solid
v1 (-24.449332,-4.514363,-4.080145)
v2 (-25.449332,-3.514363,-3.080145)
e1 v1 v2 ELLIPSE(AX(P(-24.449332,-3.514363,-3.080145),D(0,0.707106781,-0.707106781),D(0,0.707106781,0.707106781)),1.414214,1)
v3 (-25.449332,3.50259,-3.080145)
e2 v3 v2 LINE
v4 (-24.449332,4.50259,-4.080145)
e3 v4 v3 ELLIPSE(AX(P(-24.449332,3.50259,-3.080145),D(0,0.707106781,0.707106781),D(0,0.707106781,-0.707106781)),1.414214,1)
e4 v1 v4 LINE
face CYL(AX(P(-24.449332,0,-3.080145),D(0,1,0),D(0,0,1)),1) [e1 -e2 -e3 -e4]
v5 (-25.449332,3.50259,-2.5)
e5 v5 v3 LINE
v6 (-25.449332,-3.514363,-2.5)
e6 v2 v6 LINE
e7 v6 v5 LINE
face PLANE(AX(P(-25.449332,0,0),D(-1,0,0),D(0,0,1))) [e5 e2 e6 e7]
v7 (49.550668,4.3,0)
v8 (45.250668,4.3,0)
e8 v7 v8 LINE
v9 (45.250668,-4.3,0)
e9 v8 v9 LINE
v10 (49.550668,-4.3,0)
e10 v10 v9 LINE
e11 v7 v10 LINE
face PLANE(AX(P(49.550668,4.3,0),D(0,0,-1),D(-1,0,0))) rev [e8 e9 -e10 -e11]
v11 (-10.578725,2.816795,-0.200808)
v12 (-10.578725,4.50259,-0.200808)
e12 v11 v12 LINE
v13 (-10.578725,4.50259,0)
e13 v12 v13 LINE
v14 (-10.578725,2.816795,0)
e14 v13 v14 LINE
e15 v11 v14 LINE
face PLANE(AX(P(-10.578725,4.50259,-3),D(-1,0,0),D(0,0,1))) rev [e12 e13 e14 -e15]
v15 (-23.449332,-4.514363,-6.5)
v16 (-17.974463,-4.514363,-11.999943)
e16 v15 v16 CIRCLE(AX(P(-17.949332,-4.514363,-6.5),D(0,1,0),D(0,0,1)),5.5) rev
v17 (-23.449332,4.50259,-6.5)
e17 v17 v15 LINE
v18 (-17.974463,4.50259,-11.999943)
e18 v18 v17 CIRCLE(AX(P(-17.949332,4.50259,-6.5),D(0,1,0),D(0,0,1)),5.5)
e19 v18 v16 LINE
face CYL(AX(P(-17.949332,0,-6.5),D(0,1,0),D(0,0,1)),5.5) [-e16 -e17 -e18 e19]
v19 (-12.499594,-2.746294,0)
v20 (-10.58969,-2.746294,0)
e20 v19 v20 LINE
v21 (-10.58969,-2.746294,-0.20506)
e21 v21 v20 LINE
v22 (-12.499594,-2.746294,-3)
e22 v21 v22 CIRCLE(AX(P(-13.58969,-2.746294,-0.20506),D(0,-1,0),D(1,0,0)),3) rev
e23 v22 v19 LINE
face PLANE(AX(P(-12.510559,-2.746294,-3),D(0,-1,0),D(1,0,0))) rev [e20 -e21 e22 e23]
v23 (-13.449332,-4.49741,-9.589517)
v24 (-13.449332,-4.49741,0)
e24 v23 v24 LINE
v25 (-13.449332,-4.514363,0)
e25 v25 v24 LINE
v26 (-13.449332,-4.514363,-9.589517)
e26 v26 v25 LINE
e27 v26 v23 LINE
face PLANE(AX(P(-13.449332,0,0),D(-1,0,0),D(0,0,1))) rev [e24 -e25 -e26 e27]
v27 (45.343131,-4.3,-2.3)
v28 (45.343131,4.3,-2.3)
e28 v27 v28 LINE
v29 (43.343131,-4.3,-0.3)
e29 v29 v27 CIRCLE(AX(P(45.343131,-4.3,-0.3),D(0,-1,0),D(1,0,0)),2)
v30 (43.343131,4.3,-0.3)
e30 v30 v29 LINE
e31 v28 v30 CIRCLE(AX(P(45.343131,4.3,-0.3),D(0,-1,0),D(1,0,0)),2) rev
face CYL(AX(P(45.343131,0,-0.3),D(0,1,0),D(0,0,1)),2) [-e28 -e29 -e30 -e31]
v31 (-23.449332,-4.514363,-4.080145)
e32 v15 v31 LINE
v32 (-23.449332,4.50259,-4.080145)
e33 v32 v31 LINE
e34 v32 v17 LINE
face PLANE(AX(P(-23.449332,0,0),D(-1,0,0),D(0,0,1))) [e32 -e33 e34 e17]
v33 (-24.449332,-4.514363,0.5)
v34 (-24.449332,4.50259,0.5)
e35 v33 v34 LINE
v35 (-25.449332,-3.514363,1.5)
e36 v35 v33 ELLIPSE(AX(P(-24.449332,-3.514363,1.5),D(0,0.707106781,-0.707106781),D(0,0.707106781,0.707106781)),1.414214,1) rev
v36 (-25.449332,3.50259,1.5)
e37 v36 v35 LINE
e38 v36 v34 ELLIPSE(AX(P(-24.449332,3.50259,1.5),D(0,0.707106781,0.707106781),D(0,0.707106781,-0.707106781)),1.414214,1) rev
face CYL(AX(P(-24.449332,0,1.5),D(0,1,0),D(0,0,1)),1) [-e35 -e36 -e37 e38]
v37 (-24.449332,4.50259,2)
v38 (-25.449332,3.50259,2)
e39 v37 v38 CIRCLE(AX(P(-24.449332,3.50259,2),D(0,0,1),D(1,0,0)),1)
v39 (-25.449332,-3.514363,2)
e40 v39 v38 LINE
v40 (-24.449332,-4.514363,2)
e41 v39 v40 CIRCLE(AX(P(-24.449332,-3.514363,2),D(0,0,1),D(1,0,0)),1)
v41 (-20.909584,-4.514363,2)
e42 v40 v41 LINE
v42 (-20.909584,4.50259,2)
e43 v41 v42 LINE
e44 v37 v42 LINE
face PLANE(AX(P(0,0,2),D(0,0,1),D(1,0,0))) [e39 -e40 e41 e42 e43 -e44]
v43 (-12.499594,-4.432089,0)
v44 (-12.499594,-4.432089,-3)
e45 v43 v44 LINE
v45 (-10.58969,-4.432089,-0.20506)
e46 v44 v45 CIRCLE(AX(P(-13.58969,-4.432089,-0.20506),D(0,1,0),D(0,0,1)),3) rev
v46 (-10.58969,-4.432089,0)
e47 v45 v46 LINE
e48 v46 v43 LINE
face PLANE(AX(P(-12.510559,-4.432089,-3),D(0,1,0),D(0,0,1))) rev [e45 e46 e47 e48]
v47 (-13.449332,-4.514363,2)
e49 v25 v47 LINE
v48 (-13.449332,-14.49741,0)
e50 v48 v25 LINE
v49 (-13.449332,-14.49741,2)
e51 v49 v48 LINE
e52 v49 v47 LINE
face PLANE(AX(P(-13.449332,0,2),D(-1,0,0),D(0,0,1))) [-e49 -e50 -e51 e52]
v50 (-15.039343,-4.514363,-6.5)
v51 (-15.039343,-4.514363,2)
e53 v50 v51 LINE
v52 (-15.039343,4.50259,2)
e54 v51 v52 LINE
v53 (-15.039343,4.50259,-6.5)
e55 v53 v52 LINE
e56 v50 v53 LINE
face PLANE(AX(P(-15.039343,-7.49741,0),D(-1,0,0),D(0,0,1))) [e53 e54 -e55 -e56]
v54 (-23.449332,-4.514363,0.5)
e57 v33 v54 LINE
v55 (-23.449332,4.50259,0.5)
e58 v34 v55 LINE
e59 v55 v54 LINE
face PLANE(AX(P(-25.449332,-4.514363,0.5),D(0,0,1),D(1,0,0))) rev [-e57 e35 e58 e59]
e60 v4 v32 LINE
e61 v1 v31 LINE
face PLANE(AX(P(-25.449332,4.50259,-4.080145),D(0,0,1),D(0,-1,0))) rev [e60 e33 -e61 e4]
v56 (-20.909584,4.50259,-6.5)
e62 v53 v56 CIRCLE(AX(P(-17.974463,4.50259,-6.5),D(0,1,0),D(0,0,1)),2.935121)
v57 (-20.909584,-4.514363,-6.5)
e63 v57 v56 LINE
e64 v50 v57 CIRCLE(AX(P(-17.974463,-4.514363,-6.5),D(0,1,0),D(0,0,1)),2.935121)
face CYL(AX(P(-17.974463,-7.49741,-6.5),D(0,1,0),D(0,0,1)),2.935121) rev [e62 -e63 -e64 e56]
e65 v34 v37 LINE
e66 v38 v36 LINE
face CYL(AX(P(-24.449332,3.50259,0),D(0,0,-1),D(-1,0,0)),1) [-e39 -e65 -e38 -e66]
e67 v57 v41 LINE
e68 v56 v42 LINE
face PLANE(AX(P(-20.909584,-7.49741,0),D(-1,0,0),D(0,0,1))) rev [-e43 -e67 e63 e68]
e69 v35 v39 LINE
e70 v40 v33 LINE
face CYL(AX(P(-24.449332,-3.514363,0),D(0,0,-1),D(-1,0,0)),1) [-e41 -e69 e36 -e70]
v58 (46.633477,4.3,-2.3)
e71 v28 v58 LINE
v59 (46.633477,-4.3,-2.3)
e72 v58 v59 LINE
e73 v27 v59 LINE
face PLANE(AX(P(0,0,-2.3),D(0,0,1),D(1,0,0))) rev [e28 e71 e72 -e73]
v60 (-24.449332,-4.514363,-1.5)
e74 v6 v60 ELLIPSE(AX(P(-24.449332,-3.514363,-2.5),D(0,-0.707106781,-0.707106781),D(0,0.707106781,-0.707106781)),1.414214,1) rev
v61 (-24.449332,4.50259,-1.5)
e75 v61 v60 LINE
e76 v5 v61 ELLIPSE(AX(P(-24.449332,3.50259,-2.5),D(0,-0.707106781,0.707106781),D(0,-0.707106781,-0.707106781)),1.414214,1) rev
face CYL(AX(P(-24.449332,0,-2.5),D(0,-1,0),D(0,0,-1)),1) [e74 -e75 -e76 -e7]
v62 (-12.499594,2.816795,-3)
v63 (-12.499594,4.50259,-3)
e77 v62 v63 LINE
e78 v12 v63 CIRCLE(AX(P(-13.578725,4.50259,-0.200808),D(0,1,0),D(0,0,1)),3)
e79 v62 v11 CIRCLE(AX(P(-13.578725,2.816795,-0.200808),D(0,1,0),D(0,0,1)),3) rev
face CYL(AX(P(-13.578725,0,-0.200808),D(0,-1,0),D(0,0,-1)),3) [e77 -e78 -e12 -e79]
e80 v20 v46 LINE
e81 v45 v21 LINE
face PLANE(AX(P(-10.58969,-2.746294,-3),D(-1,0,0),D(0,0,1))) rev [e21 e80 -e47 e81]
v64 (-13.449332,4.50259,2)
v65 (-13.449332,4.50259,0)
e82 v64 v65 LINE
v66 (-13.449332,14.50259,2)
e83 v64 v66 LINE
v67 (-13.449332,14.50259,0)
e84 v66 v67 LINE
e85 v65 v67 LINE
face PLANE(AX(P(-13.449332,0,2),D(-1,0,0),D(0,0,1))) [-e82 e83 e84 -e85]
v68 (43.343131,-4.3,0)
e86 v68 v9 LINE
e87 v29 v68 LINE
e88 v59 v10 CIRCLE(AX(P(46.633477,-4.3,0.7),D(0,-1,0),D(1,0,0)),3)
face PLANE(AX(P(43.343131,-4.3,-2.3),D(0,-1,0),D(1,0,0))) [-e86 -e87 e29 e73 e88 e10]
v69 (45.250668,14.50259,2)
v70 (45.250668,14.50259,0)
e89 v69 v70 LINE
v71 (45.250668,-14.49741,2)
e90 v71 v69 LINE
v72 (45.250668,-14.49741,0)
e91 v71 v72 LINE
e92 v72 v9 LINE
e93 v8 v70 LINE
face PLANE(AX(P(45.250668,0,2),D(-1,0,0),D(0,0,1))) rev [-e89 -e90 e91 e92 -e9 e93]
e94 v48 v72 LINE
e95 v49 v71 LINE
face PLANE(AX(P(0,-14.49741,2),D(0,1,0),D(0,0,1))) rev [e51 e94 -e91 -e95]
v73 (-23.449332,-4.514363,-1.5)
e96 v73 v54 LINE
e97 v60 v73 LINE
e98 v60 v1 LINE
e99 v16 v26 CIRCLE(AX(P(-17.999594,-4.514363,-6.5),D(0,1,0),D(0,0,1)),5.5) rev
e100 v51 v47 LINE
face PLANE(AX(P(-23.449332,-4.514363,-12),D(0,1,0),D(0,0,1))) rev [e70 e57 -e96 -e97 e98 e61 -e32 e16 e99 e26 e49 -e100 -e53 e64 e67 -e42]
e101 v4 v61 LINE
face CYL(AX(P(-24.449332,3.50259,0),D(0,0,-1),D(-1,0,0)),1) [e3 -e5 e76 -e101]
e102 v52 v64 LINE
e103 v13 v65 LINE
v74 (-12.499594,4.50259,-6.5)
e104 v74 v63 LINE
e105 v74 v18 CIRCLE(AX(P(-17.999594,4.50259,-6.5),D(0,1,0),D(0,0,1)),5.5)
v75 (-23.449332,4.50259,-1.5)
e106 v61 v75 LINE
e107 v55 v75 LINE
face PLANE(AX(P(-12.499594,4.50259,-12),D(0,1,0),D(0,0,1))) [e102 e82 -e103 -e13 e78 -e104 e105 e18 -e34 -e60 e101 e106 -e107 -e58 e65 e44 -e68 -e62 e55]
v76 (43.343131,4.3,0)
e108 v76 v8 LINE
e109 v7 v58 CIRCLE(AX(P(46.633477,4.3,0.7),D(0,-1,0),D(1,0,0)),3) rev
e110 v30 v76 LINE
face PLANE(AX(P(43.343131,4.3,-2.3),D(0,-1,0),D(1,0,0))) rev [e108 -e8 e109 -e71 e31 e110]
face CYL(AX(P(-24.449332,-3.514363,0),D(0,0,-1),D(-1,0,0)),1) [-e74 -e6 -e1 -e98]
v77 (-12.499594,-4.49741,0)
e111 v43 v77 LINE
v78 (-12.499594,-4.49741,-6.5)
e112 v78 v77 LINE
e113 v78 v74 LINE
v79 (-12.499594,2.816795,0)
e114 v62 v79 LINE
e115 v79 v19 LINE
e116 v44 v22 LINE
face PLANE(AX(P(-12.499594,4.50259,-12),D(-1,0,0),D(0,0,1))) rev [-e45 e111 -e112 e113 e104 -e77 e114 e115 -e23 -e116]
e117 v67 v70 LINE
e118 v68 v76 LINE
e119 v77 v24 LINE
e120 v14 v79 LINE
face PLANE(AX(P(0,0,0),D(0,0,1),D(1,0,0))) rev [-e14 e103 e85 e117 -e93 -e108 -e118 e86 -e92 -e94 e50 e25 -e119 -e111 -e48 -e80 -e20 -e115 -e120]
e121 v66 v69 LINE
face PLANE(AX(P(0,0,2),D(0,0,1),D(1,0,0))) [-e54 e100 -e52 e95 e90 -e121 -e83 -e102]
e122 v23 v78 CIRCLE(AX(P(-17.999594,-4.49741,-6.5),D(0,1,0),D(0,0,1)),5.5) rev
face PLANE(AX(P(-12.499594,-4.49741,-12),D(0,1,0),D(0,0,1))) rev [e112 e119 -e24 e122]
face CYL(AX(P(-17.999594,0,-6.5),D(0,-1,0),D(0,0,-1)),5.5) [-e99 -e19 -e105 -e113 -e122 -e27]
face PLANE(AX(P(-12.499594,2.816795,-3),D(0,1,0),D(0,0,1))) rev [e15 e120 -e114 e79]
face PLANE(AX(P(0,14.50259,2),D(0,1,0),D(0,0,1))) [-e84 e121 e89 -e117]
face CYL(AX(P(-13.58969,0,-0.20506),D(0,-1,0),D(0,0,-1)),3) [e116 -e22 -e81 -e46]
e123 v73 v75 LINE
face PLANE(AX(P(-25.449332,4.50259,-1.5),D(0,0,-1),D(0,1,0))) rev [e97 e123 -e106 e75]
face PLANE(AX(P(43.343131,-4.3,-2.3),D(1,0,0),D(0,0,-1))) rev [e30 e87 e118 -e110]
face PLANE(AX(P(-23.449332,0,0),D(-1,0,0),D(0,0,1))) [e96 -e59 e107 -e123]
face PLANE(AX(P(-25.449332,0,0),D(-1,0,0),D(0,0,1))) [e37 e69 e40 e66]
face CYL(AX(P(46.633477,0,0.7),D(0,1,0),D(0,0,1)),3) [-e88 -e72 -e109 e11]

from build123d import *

# Parameters (mm, degrees)
SKETCH1_W           = 58.7
SKETCH1_H           = 14.5
BOSS_EXTRUDE1_DEPTH = 2
SKETCH2_W           = 1.907537222
SKETCH2_H           = 8.6
BOSS_EXTRUDE2_DEPTH = 4.3
SKETCH3_W           = 2.3
SKETCH3_H           = 8.6
BOSS_EXTRUDE3_DEPTH = 4.3
FILLET3_R           = 2
SKETCH4_W           = 0.949738238
SKETCH4_H           = 9
BOSS_EXTRUDE4_DEPTH = 12
SKETCH5_W           = 14
SKETCH5_H           = 9.016953004
BOSS_EXTRUDE5_DEPTH = 10
FILLET4_R           = 5.5
CUT_EXTRUDE1_DEPTH  = 12
SKETCH8_W           = 2.580145407
SKETCH8_H           = 9.016953004
SKETCH8_W_2         = 1.5
BOSS_EXTRUDE6_DEPTH = 2
SKETCH9_W           = 1.920869139
SKETCH9_H           = 1.685794619
SKETCH9_H_2         = 1.68579462
BOSS_EXTRUDE7_DEPTH = 3
FILLET6_R           = 3
FILLET9_R           = 3
FILLET11_R          = 1
FILLET12_R          = 1


with BuildPart() as part:
    # Sketch1 → Boss-Extrude1 (new body)
    with BuildSketch(Plane.XY):
        with Locations((15.900667763, -7.24741023)):
            Rectangle(SKETCH1_W, SKETCH1_H)
        with Locations((15.900667763, 7.25258977)):
            Rectangle(SKETCH1_W, SKETCH1_H)
    extrude(amount=BOSS_EXTRUDE1_DEPTH)

    # Sketch2 → Boss-Extrude2 (add)
    with BuildSketch(Plane.XY.offset(2)):
        with Locations((44.296899152, 0)):
            Rectangle(SKETCH2_W, SKETCH2_H)
    extrude(amount=-BOSS_EXTRUDE2_DEPTH)

    # Sketch3 → Boss-Extrude3 (add)
    with BuildSketch(Plane(origin=(45.250667763, 0, 0), x_dir=(0, 0, -1), z_dir=(1, 0, 0))):
        with Locations((1.15, 0)):
            Rectangle(SKETCH3_W, SKETCH3_H)
    extrude(amount=BOSS_EXTRUDE3_DEPTH)

    # Fillet3
    fillet3_edges = [part.edges().sort_by_distance(p)[0] for p in [
        (43.343130541, 0, -2.3),
    ]]
    fillet(fillet3_edges, radius=FILLET3_R)

    # Sketch4 → Boss-Extrude4 (add)
    with BuildSketch(Plane(origin=(0, 0, 0), x_dir=(-1, 0, 0), z_dir=(0, 0, -1))):
        with Locations((12.974463118, 0.00258977)):
            Rectangle(SKETCH4_W, SKETCH4_H)
    extrude(amount=BOSS_EXTRUDE4_DEPTH)

    # Sketch5 → Boss-Extrude5 (add)
    with BuildSketch(Plane.ZY.offset(13.449332237)):
        with Locations((-5, -0.005886732)):
            Rectangle(SKETCH5_W, SKETCH5_H)
    extrude(amount=BOSS_EXTRUDE5_DEPTH)

    # Fillet4
    # the kernel refuses this fillet: 5.5 mm, written as the material it takes off along each edge
    with BuildSketch(Plane(origin=(-23.449332237, -18.264363234, -12), x_dir=(1, 0, 0), z_dir=(0, 1, 0))) as fillet4_piece_1:
        with BuildLine():
            CenterArc((FILLET4_R, -FILLET4_R), FILLET4_R, 90, 90)
            Line((0, -FILLET4_R), (0, 0))
            Line((0, 0), (FILLET4_R, 0))
        make_face()
    extrude(amount=36.516953004, mode=Mode.SUBTRACT)
    with BuildSketch(Plane(origin=(-12.499593999, -18.24741023, -12), x_dir=(-1, 0, 0), z_dir=(0, 1, 0))) as fillet4_piece_2:
        with BuildLine():
            CenterArc((FILLET4_R, FILLET4_R), FILLET4_R, 180, 90)
            Line((0, FILLET4_R), (0, 0))
            Line((0, 0), (FILLET4_R, 0))
        make_face()
    extrude(amount=36.5, mode=Mode.SUBTRACT)

    # Sketch7 → Cut-Extrude1 (cut)
    with BuildSketch(Plane(origin=(0, 4.50258977, 0), x_dir=(1, 0, 0), z_dir=(0, 1, 0))):
        with BuildLine():
            ThreePointArc((-15.03934254, 6.5), (-17.974463118, 9.435120578), (-20.909583696, 6.5))
            Line((-20.909583696, 6.5), (-15.03934254, 6.5))
        make_face()
        with BuildLine():
            Line((-15.03934254, 6.5), (-20.909583696, 6.5))
            ThreePointArc((-20.909583696, 6.5), (-17.974463118, 3.564879422), (-15.03934254, 6.5))
        make_face()
        with BuildLine():
            ThreePointArc((-15.03934254, 6.5), (-17.974463118, 3.564879422), (-20.909583696, 6.5))
            Line((-20.909583696, 6.5), (-20.909583696, -2))
            Line((-20.909583696, -2), (-15.03934254, -2))
            Line((-15.03934254, -2), (-15.03934254, 6.5))
        make_face()
    extrude(amount=-CUT_EXTRUDE1_DEPTH, mode=Mode.SUBTRACT)

    # Sketch8 → Boss-Extrude6 (add)
    with BuildSketch(Plane.ZY.offset(23.449332237)):
        with Locations((-2.790072703, -0.005886732)):
            Rectangle(SKETCH8_W, SKETCH8_H)
        with Locations((1.25, -0.005886732)):
            Rectangle(SKETCH8_W_2, SKETCH8_H)
    extrude(amount=BOSS_EXTRUDE6_DEPTH)

    # Sketch9 → Boss-Extrude7 (add)
    with BuildSketch(Plane(origin=(0, 0, 0), x_dir=(-1, 0, 0), z_dir=(0, 0, -1))):
        with Locations((11.550124457, -3.589191377)):
            Rectangle(SKETCH9_W, SKETCH9_H)
        with Locations((11.539159429, 3.65969246)):
            Rectangle(SKETCH9_W, SKETCH9_H_2)
    extrude(amount=BOSS_EXTRUDE7_DEPTH)

    # Fillet6
    # the kernel refuses this fillet: 3 mm, written as the material it takes off along each edge
    with BuildSketch(Plane(origin=(-10.589689887, 4.241056538, -3), x_dir=(-1, 0, 0), z_dir=(0, -1, 0))) as fillet6_piece_1_section:
        with BuildLine():
            CenterArc((3, -2.794940242), FILLET6_R, 111.307014795, 68.692985205)
            Line((0, -2.794940242), (0, 0))
            Line((0, 0), (1.909904112, 0))
        make_face()
    fillet6_piece_1 = extrude(amount=15.660495829, mode=Mode.PRIVATE)
    fillet6_piece_1 = split(fillet6_piece_1, bisect_by=Plane(origin=(-11.107813793, 2.81679515, -1.901033535), z_dir=(0, -1, 0)), keep=Keep.TOP, mode=Mode.PRIVATE)
    add(fillet6_piece_1, mode=Mode.SUBTRACT)
    with BuildSketch(Plane(origin=(-10.57872486, 11.500570097, -3), x_dir=(-1, 0, 0), z_dir=(0, -1, 0))) as fillet6_piece_2:
        with BuildLine():
            CenterArc((3, -2.799192131), FILLET6_R, 111.082404826, 68.917595174)
            Line((0, -2.799192131), (0, 0))
            Line((0, 0), (1.920869139, 0))
        make_face()
    extrude(amount=15.681755273, mode=Mode.SUBTRACT)

    # Fillet9
    # the kernel refuses this fillet: 3 mm, written as the material it takes off along each edge
    with BuildSketch(Plane(origin=(49.550667763, 11.592976073, -2.3), x_dir=(-1, 0, 0), z_dir=(0, -1, 0))) as fillet9_piece_1:
        with BuildLine():
            CenterArc((2.917190429, -3), FILLET9_R, 90, 76.506601178)
            Line((0, -2.3), (-0.058343809, -2.286))
            ThreePointArc((-0.058343809, -2.286), (-0.06, -1.15), (-0.06, 0))
            Line((-0.06, 0), (0, 0.06))
            Line((0, 0.06), (2.917190429, 0.06))
            Line((2.917190429, 0.06), (2.917190429, 0))
        make_face()
    extrude(amount=23.185952146, mode=Mode.SUBTRACT)

    # Fillet11
    fillet11_edges = [part.edges().sort_by_distance(p)[0] for p in [
        (-25.449332237, -0.005886732, -4.080145407),
        (-25.449332237, -4.514363234, -2.790072704),
        (-25.449332237, -0.005886732, -1.5),
        (-25.449332237, 4.50258977, -2.790072704),
    ]]
    fillet(fillet11_edges, radius=FILLET11_R)

    # Fillet12
    fillet12_edges = [part.edges().sort_by_distance(p)[0] for p in [
        (-25.449332237, 4.50258977, 1.25),
        (-25.449332237, -0.005886732, 0.5),
        (-25.449332237, -4.514363234, 1.25),
    ]]
    fillet(fillet12_edges, radius=FILLET12_R)


solid = part.part
